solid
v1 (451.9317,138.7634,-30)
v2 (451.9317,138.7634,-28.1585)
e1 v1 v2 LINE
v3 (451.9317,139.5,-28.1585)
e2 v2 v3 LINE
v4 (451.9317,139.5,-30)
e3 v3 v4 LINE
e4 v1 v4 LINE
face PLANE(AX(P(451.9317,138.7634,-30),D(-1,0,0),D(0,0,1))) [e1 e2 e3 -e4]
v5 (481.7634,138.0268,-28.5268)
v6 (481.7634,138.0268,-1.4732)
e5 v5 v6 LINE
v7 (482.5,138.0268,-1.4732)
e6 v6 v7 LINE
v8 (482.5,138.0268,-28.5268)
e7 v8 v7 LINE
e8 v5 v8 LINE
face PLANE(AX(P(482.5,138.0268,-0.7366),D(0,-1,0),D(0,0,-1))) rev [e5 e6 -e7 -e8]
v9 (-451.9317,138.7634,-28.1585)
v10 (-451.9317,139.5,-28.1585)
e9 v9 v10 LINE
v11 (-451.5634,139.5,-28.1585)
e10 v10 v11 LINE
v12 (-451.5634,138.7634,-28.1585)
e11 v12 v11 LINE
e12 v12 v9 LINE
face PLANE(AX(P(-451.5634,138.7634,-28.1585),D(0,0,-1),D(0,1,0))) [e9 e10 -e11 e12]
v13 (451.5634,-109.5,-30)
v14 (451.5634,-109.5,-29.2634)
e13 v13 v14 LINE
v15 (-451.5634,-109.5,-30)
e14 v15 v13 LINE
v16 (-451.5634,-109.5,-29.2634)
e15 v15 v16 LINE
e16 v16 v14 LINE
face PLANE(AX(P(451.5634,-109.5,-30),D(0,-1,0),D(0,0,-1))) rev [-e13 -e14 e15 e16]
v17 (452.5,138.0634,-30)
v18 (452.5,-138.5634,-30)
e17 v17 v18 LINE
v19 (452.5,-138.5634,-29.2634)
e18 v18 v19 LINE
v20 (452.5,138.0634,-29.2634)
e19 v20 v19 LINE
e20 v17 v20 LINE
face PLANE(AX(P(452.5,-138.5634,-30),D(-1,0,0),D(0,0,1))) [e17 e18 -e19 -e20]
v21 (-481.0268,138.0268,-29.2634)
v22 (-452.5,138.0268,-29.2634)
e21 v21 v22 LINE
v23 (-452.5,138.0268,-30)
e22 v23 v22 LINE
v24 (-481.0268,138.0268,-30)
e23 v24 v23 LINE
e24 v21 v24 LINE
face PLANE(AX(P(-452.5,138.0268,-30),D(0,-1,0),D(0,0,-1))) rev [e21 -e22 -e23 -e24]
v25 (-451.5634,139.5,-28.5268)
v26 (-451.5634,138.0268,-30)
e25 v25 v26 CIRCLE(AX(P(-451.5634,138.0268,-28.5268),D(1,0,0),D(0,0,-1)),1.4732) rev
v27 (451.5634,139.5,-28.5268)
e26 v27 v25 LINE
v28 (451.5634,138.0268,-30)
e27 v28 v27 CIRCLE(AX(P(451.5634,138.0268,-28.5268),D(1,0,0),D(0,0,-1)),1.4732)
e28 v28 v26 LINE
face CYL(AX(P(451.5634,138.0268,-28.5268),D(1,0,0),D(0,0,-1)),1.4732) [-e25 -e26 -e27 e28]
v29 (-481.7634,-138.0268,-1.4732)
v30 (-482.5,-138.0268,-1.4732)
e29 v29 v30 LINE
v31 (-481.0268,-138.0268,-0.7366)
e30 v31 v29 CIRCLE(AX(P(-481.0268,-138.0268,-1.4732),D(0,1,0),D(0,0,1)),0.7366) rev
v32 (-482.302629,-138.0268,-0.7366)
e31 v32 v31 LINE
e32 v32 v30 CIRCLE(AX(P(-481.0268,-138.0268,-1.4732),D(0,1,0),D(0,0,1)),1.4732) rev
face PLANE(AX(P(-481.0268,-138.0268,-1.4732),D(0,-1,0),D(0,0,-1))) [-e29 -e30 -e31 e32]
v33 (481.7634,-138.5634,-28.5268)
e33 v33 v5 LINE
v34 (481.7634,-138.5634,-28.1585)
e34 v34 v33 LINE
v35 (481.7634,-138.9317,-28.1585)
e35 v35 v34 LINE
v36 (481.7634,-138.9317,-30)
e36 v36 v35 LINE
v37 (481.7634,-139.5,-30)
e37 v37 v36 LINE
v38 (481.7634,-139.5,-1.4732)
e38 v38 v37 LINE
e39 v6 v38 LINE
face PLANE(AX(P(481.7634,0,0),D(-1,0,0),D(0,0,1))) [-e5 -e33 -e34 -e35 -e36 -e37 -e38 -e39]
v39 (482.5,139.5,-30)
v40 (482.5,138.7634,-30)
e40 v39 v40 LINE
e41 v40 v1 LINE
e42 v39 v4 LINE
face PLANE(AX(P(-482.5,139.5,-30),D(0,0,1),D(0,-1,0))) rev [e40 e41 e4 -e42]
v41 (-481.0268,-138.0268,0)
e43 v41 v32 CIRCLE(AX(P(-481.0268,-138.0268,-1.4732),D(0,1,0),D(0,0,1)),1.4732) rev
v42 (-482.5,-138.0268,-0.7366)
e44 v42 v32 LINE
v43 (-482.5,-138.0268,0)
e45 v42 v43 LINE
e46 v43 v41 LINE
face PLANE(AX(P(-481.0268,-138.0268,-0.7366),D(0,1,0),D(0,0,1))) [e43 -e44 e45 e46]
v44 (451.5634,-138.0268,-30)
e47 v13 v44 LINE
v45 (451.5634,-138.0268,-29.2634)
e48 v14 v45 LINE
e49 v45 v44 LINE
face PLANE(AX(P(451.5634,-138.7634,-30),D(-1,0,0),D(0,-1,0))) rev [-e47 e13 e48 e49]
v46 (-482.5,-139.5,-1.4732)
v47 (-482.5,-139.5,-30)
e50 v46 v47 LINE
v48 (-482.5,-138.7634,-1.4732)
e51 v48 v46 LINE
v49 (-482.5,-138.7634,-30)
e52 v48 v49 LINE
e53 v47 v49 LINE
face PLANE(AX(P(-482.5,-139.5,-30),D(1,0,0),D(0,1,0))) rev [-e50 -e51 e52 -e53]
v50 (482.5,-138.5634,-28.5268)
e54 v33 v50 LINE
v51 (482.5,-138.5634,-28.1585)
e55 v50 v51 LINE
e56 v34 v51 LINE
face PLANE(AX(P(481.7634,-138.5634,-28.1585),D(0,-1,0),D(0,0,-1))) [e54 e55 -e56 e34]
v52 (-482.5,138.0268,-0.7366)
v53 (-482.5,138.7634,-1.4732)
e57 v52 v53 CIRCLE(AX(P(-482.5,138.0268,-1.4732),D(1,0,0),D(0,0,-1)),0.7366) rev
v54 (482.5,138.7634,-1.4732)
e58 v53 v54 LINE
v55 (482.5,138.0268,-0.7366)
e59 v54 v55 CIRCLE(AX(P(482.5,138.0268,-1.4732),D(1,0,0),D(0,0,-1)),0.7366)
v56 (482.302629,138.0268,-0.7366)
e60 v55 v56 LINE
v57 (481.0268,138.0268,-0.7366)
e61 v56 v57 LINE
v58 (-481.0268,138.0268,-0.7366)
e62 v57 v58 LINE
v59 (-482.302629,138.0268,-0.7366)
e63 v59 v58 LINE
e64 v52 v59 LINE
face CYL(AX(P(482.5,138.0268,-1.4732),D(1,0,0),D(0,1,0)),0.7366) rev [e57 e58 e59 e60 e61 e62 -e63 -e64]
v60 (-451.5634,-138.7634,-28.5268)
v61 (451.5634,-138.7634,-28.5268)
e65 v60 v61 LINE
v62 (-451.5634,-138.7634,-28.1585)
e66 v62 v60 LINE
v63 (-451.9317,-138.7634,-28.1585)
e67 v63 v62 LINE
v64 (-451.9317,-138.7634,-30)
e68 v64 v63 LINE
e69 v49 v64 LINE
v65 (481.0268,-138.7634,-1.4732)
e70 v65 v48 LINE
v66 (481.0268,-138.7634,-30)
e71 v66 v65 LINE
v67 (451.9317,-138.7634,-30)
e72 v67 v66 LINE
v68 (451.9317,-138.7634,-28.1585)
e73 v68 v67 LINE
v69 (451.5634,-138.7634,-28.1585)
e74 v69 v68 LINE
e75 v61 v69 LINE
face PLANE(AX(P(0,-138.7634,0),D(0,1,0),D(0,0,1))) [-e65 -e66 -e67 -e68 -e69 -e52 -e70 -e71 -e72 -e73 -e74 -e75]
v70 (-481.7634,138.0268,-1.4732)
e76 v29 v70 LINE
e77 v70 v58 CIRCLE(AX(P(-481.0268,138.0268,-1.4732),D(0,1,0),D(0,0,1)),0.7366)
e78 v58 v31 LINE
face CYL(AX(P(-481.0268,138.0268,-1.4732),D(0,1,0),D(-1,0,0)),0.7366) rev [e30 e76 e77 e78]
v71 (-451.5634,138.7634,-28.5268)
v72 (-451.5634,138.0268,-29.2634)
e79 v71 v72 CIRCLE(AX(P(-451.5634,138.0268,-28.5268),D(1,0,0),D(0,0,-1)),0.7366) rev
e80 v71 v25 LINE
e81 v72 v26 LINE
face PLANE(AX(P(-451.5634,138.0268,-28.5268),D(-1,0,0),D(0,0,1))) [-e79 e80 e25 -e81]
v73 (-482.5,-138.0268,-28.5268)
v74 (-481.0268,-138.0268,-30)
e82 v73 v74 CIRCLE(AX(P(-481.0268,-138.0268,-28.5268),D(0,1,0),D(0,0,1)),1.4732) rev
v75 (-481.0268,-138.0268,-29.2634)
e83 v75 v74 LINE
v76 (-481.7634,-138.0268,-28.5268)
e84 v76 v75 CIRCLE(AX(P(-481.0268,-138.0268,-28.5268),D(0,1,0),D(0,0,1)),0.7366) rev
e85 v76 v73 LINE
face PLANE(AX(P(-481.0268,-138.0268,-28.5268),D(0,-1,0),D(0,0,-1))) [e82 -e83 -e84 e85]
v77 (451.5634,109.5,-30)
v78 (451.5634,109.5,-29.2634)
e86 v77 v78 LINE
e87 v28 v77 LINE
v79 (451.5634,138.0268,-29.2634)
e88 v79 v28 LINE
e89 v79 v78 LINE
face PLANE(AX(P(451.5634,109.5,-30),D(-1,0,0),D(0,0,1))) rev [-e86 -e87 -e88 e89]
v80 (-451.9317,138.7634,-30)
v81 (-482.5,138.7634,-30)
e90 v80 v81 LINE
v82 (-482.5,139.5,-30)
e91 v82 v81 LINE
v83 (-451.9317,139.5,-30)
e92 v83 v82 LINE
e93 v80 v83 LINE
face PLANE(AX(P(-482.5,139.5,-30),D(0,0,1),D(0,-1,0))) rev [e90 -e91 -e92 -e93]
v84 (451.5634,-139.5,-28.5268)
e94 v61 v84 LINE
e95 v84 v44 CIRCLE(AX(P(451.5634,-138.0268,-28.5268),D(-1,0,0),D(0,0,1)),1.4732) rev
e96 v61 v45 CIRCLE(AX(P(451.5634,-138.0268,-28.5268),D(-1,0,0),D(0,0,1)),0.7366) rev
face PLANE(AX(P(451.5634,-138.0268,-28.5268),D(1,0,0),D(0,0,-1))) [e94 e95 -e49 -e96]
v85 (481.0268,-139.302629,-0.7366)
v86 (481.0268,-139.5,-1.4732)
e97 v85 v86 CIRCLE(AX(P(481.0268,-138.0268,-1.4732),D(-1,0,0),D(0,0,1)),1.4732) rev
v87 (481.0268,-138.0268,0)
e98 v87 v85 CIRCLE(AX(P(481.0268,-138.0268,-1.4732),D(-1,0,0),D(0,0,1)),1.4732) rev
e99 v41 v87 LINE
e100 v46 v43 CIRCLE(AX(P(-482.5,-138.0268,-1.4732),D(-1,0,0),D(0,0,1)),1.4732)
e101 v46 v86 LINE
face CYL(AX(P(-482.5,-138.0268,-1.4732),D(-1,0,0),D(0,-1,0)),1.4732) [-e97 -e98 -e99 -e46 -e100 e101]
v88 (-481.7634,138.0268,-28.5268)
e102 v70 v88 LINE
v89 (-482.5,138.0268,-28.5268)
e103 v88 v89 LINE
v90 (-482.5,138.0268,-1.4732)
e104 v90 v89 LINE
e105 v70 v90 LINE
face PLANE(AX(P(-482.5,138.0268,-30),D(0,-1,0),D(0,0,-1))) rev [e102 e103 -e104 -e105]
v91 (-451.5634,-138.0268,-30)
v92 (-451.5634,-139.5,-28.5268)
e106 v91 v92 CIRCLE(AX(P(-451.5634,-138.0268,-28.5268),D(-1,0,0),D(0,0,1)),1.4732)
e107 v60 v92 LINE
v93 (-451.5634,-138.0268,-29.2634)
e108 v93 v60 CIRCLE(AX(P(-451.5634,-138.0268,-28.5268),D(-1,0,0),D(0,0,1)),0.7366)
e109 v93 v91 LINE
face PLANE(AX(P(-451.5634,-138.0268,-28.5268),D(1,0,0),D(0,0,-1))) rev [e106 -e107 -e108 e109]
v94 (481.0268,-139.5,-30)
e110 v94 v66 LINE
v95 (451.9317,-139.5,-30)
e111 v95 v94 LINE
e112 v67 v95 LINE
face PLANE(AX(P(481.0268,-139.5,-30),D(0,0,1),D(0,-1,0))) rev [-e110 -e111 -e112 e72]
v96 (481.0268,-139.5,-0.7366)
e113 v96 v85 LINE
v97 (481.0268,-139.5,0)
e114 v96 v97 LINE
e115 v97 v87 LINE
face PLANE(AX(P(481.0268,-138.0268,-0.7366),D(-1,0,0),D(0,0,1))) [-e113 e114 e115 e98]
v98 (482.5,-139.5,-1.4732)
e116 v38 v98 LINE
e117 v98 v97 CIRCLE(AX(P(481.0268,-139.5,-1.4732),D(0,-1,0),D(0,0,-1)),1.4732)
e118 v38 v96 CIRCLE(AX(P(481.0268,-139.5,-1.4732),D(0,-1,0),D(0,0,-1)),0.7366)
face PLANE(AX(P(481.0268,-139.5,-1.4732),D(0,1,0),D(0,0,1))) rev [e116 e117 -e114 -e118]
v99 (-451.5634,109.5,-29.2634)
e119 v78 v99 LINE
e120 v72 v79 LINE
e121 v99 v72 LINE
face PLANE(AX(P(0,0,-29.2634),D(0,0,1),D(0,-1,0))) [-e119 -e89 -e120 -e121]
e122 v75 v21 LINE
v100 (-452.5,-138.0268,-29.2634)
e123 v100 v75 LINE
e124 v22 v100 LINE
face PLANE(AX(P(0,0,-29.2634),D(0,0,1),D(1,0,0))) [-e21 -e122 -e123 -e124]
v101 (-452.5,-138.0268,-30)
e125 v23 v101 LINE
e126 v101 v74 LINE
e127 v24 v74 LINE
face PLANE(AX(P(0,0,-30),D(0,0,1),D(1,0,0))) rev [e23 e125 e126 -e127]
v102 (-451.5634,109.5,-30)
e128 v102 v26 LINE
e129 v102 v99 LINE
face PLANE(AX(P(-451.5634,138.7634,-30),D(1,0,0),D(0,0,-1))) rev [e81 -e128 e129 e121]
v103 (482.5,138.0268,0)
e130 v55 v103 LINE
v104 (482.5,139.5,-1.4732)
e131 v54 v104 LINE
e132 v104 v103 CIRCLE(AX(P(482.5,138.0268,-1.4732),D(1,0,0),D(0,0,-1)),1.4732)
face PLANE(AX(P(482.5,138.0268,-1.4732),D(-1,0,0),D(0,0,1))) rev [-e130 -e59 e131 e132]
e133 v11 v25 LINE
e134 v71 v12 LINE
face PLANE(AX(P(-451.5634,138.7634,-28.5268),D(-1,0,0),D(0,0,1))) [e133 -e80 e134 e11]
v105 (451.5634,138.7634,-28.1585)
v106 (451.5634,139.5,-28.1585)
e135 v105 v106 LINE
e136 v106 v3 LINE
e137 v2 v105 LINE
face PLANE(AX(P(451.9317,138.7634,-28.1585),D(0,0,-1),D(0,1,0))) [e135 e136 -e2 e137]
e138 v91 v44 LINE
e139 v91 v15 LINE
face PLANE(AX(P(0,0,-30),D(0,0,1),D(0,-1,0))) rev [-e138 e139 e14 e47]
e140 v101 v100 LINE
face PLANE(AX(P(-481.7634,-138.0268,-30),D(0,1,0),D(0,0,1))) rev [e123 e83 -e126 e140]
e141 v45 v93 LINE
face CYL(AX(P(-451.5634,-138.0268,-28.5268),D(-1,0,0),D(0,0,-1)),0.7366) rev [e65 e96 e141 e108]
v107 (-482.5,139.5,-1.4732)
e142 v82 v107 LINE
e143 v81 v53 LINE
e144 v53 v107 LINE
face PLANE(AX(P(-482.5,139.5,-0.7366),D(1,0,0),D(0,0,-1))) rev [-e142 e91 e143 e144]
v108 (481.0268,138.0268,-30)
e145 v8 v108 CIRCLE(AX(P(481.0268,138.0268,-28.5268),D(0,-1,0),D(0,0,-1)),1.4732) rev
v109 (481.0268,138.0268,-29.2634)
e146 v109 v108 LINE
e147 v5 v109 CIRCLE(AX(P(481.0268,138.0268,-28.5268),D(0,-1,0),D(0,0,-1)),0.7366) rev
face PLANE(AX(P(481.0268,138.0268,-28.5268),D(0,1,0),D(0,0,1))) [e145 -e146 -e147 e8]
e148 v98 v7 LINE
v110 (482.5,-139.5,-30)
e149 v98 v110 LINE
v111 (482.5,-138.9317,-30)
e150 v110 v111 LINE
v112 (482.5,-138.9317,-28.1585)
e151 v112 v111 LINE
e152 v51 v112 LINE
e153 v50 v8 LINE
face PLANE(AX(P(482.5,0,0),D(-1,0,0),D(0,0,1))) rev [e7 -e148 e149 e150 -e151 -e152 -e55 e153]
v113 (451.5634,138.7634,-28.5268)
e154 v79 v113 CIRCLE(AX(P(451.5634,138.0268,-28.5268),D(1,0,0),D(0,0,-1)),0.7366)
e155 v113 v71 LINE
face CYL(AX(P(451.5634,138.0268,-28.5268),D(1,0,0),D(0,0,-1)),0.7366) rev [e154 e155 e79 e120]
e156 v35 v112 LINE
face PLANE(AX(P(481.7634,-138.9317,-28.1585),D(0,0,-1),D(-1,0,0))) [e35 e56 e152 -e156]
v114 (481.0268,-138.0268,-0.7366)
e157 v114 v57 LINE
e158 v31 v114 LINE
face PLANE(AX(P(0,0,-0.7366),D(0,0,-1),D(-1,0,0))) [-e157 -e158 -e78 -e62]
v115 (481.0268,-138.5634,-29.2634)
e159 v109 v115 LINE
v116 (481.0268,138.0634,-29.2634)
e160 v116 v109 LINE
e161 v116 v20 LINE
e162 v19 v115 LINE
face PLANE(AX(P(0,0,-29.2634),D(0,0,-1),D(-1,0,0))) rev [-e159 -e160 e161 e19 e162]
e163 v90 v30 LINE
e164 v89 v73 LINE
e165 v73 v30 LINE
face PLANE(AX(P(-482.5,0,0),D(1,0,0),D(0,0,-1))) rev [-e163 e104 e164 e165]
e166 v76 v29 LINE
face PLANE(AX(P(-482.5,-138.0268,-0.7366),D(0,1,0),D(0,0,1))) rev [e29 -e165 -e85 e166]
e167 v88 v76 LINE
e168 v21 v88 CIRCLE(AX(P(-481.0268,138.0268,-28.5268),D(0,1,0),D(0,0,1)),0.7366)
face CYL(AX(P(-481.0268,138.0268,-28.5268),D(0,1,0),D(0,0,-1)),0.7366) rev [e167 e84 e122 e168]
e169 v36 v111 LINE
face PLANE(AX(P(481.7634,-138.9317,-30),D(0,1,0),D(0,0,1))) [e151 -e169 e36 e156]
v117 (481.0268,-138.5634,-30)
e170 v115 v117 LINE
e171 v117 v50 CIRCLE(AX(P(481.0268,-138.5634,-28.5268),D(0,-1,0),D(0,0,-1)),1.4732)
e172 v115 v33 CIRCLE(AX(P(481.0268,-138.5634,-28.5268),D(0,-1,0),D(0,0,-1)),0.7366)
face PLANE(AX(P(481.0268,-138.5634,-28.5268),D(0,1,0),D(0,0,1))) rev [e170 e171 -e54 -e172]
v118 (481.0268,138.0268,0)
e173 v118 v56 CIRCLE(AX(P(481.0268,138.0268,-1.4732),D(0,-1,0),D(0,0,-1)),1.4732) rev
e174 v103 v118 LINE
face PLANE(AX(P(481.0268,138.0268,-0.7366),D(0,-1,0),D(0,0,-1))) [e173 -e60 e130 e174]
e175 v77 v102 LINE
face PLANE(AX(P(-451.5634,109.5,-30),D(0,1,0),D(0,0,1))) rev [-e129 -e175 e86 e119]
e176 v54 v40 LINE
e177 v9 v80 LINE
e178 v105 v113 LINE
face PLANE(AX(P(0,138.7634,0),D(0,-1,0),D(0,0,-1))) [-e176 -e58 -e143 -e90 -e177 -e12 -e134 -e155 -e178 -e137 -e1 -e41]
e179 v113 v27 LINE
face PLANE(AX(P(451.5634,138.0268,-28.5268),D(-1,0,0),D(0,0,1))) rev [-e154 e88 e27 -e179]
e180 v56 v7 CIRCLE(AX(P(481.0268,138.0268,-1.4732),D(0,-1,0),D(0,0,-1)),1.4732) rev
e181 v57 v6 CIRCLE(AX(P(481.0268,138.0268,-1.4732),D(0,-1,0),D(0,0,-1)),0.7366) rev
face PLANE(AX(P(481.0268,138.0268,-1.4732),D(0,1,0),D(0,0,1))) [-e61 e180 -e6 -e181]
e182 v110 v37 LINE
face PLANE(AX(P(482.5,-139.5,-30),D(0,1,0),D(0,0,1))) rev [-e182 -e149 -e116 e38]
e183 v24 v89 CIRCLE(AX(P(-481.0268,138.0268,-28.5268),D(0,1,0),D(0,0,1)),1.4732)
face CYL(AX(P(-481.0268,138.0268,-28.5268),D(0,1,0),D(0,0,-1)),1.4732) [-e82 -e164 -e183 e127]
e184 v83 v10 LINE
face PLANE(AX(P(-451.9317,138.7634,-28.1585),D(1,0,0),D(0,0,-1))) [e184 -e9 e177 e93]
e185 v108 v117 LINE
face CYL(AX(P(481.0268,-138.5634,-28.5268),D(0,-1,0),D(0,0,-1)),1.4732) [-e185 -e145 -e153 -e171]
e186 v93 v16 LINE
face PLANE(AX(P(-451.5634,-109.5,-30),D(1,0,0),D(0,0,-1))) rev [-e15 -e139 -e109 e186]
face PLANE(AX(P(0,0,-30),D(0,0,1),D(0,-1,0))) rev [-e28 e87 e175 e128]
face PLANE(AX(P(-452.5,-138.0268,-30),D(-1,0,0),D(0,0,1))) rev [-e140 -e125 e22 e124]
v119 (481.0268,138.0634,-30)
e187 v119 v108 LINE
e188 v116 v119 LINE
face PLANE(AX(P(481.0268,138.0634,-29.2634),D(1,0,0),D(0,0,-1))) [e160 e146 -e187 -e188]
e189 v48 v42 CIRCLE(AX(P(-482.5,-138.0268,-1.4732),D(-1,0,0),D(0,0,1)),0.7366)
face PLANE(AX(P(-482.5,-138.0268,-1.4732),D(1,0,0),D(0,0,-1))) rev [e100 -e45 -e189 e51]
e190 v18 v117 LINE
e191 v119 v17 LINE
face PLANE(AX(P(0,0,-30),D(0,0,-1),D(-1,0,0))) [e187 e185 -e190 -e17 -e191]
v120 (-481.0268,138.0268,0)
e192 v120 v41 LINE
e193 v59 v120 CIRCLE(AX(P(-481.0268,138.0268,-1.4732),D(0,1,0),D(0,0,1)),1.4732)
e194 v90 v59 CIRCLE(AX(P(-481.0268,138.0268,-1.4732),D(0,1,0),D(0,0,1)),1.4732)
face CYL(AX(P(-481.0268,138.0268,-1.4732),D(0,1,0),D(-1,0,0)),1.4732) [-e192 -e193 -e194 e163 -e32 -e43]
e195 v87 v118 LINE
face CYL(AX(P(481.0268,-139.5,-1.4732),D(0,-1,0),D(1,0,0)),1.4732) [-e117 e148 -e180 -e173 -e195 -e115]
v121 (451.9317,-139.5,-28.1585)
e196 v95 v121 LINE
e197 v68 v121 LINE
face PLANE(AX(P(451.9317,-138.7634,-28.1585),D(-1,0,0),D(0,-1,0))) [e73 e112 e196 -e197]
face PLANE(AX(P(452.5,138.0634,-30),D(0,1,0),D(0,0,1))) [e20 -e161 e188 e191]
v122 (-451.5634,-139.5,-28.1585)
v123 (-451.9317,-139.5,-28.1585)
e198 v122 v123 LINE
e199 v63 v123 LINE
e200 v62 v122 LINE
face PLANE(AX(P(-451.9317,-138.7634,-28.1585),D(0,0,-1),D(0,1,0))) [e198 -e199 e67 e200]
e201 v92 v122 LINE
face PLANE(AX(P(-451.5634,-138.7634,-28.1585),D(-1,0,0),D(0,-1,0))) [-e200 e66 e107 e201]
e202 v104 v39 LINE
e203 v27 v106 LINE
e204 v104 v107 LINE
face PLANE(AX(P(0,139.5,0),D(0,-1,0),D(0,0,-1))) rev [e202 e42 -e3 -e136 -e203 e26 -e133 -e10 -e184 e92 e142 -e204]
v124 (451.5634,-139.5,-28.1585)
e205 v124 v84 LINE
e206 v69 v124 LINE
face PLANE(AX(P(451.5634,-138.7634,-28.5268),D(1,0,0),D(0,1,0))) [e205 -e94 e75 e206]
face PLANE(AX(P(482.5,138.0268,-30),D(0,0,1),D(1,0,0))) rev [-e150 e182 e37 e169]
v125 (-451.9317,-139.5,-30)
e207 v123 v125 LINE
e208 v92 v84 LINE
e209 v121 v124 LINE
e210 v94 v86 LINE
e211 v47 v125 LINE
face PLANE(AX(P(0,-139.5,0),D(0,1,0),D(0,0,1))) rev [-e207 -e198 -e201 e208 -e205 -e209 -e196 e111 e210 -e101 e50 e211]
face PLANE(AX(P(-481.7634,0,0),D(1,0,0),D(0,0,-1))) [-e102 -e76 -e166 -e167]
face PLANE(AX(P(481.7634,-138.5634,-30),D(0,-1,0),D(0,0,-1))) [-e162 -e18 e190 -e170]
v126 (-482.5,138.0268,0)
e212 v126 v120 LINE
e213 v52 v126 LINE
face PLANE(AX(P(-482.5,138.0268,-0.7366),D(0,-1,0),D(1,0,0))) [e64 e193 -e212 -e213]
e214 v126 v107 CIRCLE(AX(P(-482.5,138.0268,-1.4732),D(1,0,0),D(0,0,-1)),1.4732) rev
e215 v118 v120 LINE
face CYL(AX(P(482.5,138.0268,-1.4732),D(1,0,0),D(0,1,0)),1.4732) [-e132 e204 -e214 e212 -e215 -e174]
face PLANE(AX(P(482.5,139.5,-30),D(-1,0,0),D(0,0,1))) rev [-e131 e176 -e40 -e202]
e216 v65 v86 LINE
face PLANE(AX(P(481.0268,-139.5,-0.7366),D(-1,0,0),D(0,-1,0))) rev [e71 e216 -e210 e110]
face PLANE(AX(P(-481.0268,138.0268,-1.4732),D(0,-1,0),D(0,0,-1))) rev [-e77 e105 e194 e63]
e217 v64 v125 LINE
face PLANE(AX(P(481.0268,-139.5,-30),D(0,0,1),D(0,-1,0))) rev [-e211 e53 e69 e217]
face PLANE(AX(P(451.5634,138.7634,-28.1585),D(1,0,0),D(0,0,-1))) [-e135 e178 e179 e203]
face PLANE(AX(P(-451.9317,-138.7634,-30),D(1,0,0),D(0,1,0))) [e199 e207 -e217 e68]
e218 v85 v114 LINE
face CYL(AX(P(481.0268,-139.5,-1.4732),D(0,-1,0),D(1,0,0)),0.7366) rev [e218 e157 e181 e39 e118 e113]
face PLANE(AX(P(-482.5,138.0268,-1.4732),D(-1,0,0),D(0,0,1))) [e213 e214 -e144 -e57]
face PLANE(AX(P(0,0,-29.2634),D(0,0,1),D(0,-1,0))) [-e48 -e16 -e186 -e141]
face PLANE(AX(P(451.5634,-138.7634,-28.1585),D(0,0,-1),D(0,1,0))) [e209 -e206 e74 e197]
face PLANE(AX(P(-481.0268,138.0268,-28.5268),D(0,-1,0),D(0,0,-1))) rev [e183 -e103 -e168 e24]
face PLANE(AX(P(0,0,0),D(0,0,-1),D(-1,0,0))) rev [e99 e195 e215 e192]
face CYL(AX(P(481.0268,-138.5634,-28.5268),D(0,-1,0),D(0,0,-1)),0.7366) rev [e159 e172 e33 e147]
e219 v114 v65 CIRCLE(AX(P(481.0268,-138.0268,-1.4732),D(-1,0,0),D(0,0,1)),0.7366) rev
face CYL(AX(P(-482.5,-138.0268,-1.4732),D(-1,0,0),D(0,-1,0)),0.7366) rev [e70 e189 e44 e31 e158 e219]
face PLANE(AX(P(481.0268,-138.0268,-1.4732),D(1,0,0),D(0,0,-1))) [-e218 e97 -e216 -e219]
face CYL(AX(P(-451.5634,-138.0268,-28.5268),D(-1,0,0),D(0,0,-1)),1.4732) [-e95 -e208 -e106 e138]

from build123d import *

# Parameters (mm, degrees)
SKETCH1_W                     = 965
SKETCH1_H                     = 279
BASE_FLANGE1_DEPTH            = 0.7366
EDGE_FLANGE1_STRIP_W          = 4.4196
EDGE_FLANGE1_STRIP_H          = 0.7366
EDGE_FLANGE1_STRIP_CUT_DEPTH  = 965
EDGE_FLANGE1_DEPTH            = 965
EDGE_FLANGE2_STRIP_W          = 4.4196
EDGE_FLANGE2_STRIP_H          = 0.7366
EDGE_FLANGE2_STRIP_CUT_DEPTH  = 277.5268
EDGE_FLANGE2_DEPTH            = 277.5268
EDGE_FLANGE3_STRIP_W          = 4.4196
EDGE_FLANGE3_STRIP_H          = 0.7366
EDGE_FLANGE3_STRIP_CUT_DEPTH  = 963.5268
EDGE_FLANGE3_DEPTH            = 963.5268
EDGE_FLANGE4_STRIP_W          = 4.4196
EDGE_FLANGE4_STRIP_H          = 0.7366
EDGE_FLANGE4_STRIP_CUT_DEPTH  = 276.0536
EDGE_FLANGE4_DEPTH            = 276.0536
EDGE_FLANGE5_STRIP_W          = 4.4196
EDGE_FLANGE5_STRIP_H          = 0.7366
EDGE_FLANGE5_STRIP_CUT_DEPTH  = 903.1268
EDGE_FLANGE5_RELIEF_W         = 4.7879
EDGE_FLANGE5_RELIEF_H         = 0.3683
EDGE_FLANGE5_RELIEF_CUT_DEPTH = 0.7366
EDGE_FLANGE5_DEPTH            = 903.1268
EDGE_FLANGE6_STRIP_W          = 4.4196
EDGE_FLANGE6_STRIP_H          = 0.7366
EDGE_FLANGE6_STRIP_CUT_DEPTH  = 903.1268
EDGE_FLANGE6_RELIEF_W         = 4.7879
EDGE_FLANGE6_RELIEF_H         = 0.3683
EDGE_FLANGE6_RELIEF_CUT_DEPTH = 0.7366
EDGE_FLANGE6_DEPTH            = 903.1268
EDGE_FLANGE7_STRIP_W          = 4.4196
EDGE_FLANGE7_STRIP_H          = 0.7366
EDGE_FLANGE7_STRIP_CUT_DEPTH  = 276.5902
EDGE_FLANGE7_RELIEF_W         = 4.7879
EDGE_FLANGE7_RELIEF_H         = 0.3683
EDGE_FLANGE7_RELIEF_CUT_DEPTH = 0.7366
EDGE_FLANGE7_DEPTH            = 276.5902
EDGE_FLANGE7_PROFILE_W        = 276.6268
EDGE_FLANGE7_PROFILE_H        = 28.5268
EDGE_FLANGE7_FLAT_DEPTH       = 0.7366
EDGE_FLANGE8_STRIP_W          = 4.4196
EDGE_FLANGE8_STRIP_H          = 0.7366
EDGE_FLANGE8_STRIP_CUT_DEPTH  = 276.0536
EDGE_FLANGE8_DEPTH            = 276.0536


# Sheet-metal steps are written as plain solids
with BuildPart() as part:
    # Sketch1 → Base-Flange1 (new body)
    with BuildSketch(Plane.XY):
        Rectangle(SKETCH1_W, SKETCH1_H)
    extrude(amount=-BASE_FLANGE1_DEPTH)

    # Edge-Flange1 strip (across the edge) → Edge-Flange1 strip cut (cut)
    with BuildSketch(Plane(origin=(-482.5, 139.5, -0.7366), x_dir=(0, -1, 0), z_dir=(1, 0, 0))):
        with Locations((-0.7366, -0.3683)):
            Rectangle(EDGE_FLANGE1_STRIP_W, EDGE_FLANGE1_STRIP_H)
    extrude(amount=EDGE_FLANGE1_STRIP_CUT_DEPTH, mode=Mode.SUBTRACT)

    # Edge-Flange1 section (across the edge) → Edge-Flange1 (add)
    with BuildSketch(Plane(origin=(-482.5, 139.5, -0.7366), x_dir=(0, -1, 0), z_dir=(1, 0, 0))):
        with BuildLine():
            Line((0, 0.7366), (0, 29.2634))
            Line((0, 29.2634), (0.7366, 29.2634))
            Line((0.7366, 29.2634), (0.7366, 0.7366))
            ThreePointArc((0.7366, 0.7366), (0.952345145, 0.215745145), (1.4732, 0))
            Line((1.4732, 0), (1.4732, -0.7366))
            ThreePointArc((1.4732, -0.7366), (0.43149029, -0.30510971), (0, 0.7366))
        make_face()
    extrude(amount=EDGE_FLANGE1_DEPTH)

    # Edge-Flange2 strip (across the edge) → Edge-Flange2 strip cut (cut)
    with BuildSketch(Plane(origin=(482.5, 138.0268, -0.7366), x_dir=(-1, 0, 0), z_dir=(0, -1, 0))):
        with Locations((-0.7366, -0.3683)):
            Rectangle(EDGE_FLANGE2_STRIP_W, EDGE_FLANGE2_STRIP_H)
    extrude(amount=EDGE_FLANGE2_STRIP_CUT_DEPTH, mode=Mode.SUBTRACT)

    # Edge-Flange2 section (across the edge) → Edge-Flange2 (add)
    with BuildSketch(Plane(origin=(482.5, 138.0268, -0.7366), x_dir=(-1, 0, 0), z_dir=(0, -1, 0))):
        with BuildLine():
            Line((0, 0.7366), (0, 29.2634))
            Line((0, 29.2634), (0.7366, 29.2634))
            Line((0.7366, 29.2634), (0.7366, 0.7366))
            ThreePointArc((0.7366, 0.7366), (0.952345145, 0.215745145), (1.4732, 0))
            Line((1.4732, 0), (1.4732, -0.7366))
            ThreePointArc((1.4732, -0.7366), (0.43149029, -0.30510971), (0, 0.7366))
        make_face()
    extrude(amount=EDGE_FLANGE2_DEPTH)

    # Edge-Flange3 strip (across the edge) → Edge-Flange3 strip cut (cut)
    with BuildSketch(Plane(origin=(481.0268, -139.5, -0.7366), x_dir=(0, 1, 0), z_dir=(-1, 0, 0))):
        with Locations((-0.7366, -0.3683)):
            Rectangle(EDGE_FLANGE3_STRIP_W, EDGE_FLANGE3_STRIP_H)
    extrude(amount=EDGE_FLANGE3_STRIP_CUT_DEPTH, mode=Mode.SUBTRACT)

    # Edge-Flange3 section (across the edge) → Edge-Flange3 (add)
    with BuildSketch(Plane(origin=(481.0268, -139.5, -0.7366), x_dir=(0, 1, 0), z_dir=(-1, 0, 0))):
        with BuildLine():
            Line((0, 0.7366), (0, 29.2634))
            Line((0, 29.2634), (0.7366, 29.2634))
            Line((0.7366, 29.2634), (0.7366, 0.7366))
            ThreePointArc((0.7366, 0.7366), (0.952345145, 0.215745145), (1.4732, 0))
            Line((1.4732, 0), (1.4732, -0.7366))
            ThreePointArc((1.4732, -0.7366), (0.43149029, -0.30510971), (0, 0.7366))
        make_face()
    extrude(amount=EDGE_FLANGE3_DEPTH)

    # Edge-Flange4 strip (across the edge) → Edge-Flange4 strip cut (cut)
    with BuildSketch(Plane(origin=(-482.5, -138.0268, -0.7366), x_dir=(1, 0, 0), z_dir=(0, 1, 0))):
        with Locations((-0.7366, -0.3683)):
            Rectangle(EDGE_FLANGE4_STRIP_W, EDGE_FLANGE4_STRIP_H)
    extrude(amount=EDGE_FLANGE4_STRIP_CUT_DEPTH, mode=Mode.SUBTRACT)

    # Edge-Flange4 section (across the edge) → Edge-Flange4 (add)
    with BuildSketch(Plane(origin=(-482.5, -138.0268, -0.7366), x_dir=(1, 0, 0), z_dir=(0, 1, 0))):
        with BuildLine():
            Line((0, 0.7366), (0, 29.2634))
            Line((0, 29.2634), (0.7366, 29.2634))
            Line((0.7366, 29.2634), (0.7366, 0.7366))
            ThreePointArc((0.7366, 0.7366), (0.952345145, 0.215745145), (1.4732, 0))
            Line((1.4732, 0), (1.4732, -0.7366))
            ThreePointArc((1.4732, -0.7366), (0.43149029, -0.30510971), (0, 0.7366))
        make_face()
    extrude(amount=EDGE_FLANGE4_DEPTH)

    # Edge-Flange5 strip (across the edge) → Edge-Flange5 strip cut (cut)
    with BuildSketch(Plane(origin=(451.5634, -138.7634, -30), x_dir=(0, 0, 1), z_dir=(-1, 0, 0))):
        with Locations((-0.7366, -0.3683)):
            Rectangle(EDGE_FLANGE5_STRIP_W, EDGE_FLANGE5_STRIP_H)
    extrude(amount=EDGE_FLANGE5_STRIP_CUT_DEPTH, mode=Mode.SUBTRACT)

    # Edge-Flange5 relief (on the sheet) → Edge-Flange5 relief cut (cut)
    with BuildSketch(Plane(origin=(451.5634, -138.7634, -28.5268), x_dir=(0, 0, 1), z_dir=(0, 1, 0))):
        with Locations((-2.02565, 0.18415)):
            Rectangle(EDGE_FLANGE5_RELIEF_W, EDGE_FLANGE5_RELIEF_H)
        with Locations((-2.02565, -903.31095)):
            Rectangle(EDGE_FLANGE5_RELIEF_W, EDGE_FLANGE5_RELIEF_H)
    extrude(amount=-EDGE_FLANGE5_RELIEF_CUT_DEPTH, mode=Mode.SUBTRACT)

    # Edge-Flange5 section (across the edge) → Edge-Flange5 (add)
    with BuildSketch(Plane(origin=(451.5634, -138.7634, -30), x_dir=(0, 0, 1), z_dir=(-1, 0, 0))):
        with BuildLine():
            Line((0, 0.7366), (0, 29.2634))
            Line((0, 29.2634), (0.7366, 29.2634))
            Line((0.7366, 29.2634), (0.7366, 0.7366))
            ThreePointArc((0.7366, 0.7366), (0.952345145, 0.215745145), (1.4732, 0))
            Line((1.4732, 0), (1.4732, -0.7366))
            ThreePointArc((1.4732, -0.7366), (0.43149029, -0.30510971), (0, 0.7366))
        make_face()
    extrude(amount=EDGE_FLANGE5_DEPTH)

    # Edge-Flange6 strip (across the edge) → Edge-Flange6 strip cut (cut)
    with BuildSketch(Plane(origin=(-451.5634, 138.7634, -30), x_dir=(0, 0, 1), z_dir=(1, 0, 0))):
        with Locations((-0.7366, -0.3683)):
            Rectangle(EDGE_FLANGE6_STRIP_W, EDGE_FLANGE6_STRIP_H)
    extrude(amount=EDGE_FLANGE6_STRIP_CUT_DEPTH, mode=Mode.SUBTRACT)

    # Edge-Flange6 relief (on the sheet) → Edge-Flange6 relief cut (cut)
    with BuildSketch(Plane(origin=(-451.5634, 138.7634, -28.5268), x_dir=(0, 0, 1), z_dir=(0, -1, 0))):
        with Locations((-2.02565, 0.18415)):
            Rectangle(EDGE_FLANGE6_RELIEF_W, EDGE_FLANGE6_RELIEF_H)
        with Locations((-2.02565, -903.31095)):
            Rectangle(EDGE_FLANGE6_RELIEF_W, EDGE_FLANGE6_RELIEF_H)
    extrude(amount=-EDGE_FLANGE6_RELIEF_CUT_DEPTH, mode=Mode.SUBTRACT)

    # Edge-Flange6 section (across the edge) → Edge-Flange6 (add)
    with BuildSketch(Plane(origin=(-451.5634, 138.7634, -30), x_dir=(0, 0, 1), z_dir=(1, 0, 0))):
        with BuildLine():
            Line((0, 0.7366), (0, 29.2634))
            Line((0, 29.2634), (0.7366, 29.2634))
            Line((0.7366, 29.2634), (0.7366, 0.7366))
            ThreePointArc((0.7366, 0.7366), (0.952345145, 0.215745145), (1.4732, 0))
            Line((1.4732, 0), (1.4732, -0.7366))
            ThreePointArc((1.4732, -0.7366), (0.43149029, -0.30510971), (0, 0.7366))
        make_face()
    extrude(amount=EDGE_FLANGE6_DEPTH)

    # Edge-Flange7 strip (across the edge) → Edge-Flange7 strip cut (cut)
    with BuildSketch(Plane(origin=(481.7634, 138.0268, -30), x_dir=(0, 0, 1), z_dir=(0, -1, 0))):
        with Locations((-0.7366, -0.3683)):
            Rectangle(EDGE_FLANGE7_STRIP_W, EDGE_FLANGE7_STRIP_H)
    extrude(amount=EDGE_FLANGE7_STRIP_CUT_DEPTH, mode=Mode.SUBTRACT)

    # Edge-Flange7 relief (on the sheet) → Edge-Flange7 relief cut (cut)
    with BuildSketch(Plane(origin=(481.7634, 138.0268, -28.5268), x_dir=(0, 0, 1), z_dir=(-1, 0, 0))):
        with Locations((-2.02565, -276.77435)):
            Rectangle(EDGE_FLANGE7_RELIEF_W, EDGE_FLANGE7_RELIEF_H)
    extrude(amount=-EDGE_FLANGE7_RELIEF_CUT_DEPTH, mode=Mode.SUBTRACT)

    # Edge-Flange7 bend section (across the edge) → Edge-Flange7 (add)
    with BuildSketch(Plane(origin=(481.7634, 138.0268, -30), x_dir=(0, 0, 1), z_dir=(0, -1, 0))):
        with BuildLine():
            Line((0, 0.7366), (0.7366, 0.7366))
            ThreePointArc((0.7366, 0.7366), (0.952345145, 0.215745145), (1.4732, 0))
            Line((1.4732, 0), (1.4732, -0.7366))
            ThreePointArc((1.4732, -0.7366), (0.43149029, -0.30510971), (0, 0.7366))
        make_face()
    extrude(amount=EDGE_FLANGE7_DEPTH)

    # Edge-Flange7 profile (on flange) → Edge-Flange7 flat (add)
    with BuildSketch(Plane(origin=(481.7634, 0, -30), x_dir=(0, 1, 0), z_dir=(0, 0, 1))):
        with Locations((-0.25, 15)):
            Rectangle(EDGE_FLANGE7_PROFILE_W, EDGE_FLANGE7_PROFILE_H)
    extrude(amount=EDGE_FLANGE7_FLAT_DEPTH)

    # Edge-Flange8 strip (across the edge) → Edge-Flange8 strip cut (cut)
    with BuildSketch(Plane(origin=(-481.7634, -138.0268, -30), x_dir=(0, 0, 1), z_dir=(0, 1, 0))):
        with Locations((-0.7366, -0.3683)):
            Rectangle(EDGE_FLANGE8_STRIP_W, EDGE_FLANGE8_STRIP_H)
    extrude(amount=EDGE_FLANGE8_STRIP_CUT_DEPTH, mode=Mode.SUBTRACT)

    # Edge-Flange8 section (across the edge) → Edge-Flange8 (add)
    with BuildSketch(Plane(origin=(-481.7634, -138.0268, -30), x_dir=(0, 0, 1), z_dir=(0, 1, 0))):
        with BuildLine():
            Line((0, 0.7366), (0, 29.2634))
            Line((0, 29.2634), (0.7366, 29.2634))
            Line((0.7366, 29.2634), (0.7366, 0.7366))
            ThreePointArc((0.7366, 0.7366), (0.952345145, 0.215745145), (1.4732, 0))
            Line((1.4732, 0), (1.4732, -0.7366))
            ThreePointArc((1.4732, -0.7366), (0.43149029, -0.30510971), (0, 0.7366))
        make_face()
    extrude(amount=EDGE_FLANGE8_DEPTH)


solid = part.part
